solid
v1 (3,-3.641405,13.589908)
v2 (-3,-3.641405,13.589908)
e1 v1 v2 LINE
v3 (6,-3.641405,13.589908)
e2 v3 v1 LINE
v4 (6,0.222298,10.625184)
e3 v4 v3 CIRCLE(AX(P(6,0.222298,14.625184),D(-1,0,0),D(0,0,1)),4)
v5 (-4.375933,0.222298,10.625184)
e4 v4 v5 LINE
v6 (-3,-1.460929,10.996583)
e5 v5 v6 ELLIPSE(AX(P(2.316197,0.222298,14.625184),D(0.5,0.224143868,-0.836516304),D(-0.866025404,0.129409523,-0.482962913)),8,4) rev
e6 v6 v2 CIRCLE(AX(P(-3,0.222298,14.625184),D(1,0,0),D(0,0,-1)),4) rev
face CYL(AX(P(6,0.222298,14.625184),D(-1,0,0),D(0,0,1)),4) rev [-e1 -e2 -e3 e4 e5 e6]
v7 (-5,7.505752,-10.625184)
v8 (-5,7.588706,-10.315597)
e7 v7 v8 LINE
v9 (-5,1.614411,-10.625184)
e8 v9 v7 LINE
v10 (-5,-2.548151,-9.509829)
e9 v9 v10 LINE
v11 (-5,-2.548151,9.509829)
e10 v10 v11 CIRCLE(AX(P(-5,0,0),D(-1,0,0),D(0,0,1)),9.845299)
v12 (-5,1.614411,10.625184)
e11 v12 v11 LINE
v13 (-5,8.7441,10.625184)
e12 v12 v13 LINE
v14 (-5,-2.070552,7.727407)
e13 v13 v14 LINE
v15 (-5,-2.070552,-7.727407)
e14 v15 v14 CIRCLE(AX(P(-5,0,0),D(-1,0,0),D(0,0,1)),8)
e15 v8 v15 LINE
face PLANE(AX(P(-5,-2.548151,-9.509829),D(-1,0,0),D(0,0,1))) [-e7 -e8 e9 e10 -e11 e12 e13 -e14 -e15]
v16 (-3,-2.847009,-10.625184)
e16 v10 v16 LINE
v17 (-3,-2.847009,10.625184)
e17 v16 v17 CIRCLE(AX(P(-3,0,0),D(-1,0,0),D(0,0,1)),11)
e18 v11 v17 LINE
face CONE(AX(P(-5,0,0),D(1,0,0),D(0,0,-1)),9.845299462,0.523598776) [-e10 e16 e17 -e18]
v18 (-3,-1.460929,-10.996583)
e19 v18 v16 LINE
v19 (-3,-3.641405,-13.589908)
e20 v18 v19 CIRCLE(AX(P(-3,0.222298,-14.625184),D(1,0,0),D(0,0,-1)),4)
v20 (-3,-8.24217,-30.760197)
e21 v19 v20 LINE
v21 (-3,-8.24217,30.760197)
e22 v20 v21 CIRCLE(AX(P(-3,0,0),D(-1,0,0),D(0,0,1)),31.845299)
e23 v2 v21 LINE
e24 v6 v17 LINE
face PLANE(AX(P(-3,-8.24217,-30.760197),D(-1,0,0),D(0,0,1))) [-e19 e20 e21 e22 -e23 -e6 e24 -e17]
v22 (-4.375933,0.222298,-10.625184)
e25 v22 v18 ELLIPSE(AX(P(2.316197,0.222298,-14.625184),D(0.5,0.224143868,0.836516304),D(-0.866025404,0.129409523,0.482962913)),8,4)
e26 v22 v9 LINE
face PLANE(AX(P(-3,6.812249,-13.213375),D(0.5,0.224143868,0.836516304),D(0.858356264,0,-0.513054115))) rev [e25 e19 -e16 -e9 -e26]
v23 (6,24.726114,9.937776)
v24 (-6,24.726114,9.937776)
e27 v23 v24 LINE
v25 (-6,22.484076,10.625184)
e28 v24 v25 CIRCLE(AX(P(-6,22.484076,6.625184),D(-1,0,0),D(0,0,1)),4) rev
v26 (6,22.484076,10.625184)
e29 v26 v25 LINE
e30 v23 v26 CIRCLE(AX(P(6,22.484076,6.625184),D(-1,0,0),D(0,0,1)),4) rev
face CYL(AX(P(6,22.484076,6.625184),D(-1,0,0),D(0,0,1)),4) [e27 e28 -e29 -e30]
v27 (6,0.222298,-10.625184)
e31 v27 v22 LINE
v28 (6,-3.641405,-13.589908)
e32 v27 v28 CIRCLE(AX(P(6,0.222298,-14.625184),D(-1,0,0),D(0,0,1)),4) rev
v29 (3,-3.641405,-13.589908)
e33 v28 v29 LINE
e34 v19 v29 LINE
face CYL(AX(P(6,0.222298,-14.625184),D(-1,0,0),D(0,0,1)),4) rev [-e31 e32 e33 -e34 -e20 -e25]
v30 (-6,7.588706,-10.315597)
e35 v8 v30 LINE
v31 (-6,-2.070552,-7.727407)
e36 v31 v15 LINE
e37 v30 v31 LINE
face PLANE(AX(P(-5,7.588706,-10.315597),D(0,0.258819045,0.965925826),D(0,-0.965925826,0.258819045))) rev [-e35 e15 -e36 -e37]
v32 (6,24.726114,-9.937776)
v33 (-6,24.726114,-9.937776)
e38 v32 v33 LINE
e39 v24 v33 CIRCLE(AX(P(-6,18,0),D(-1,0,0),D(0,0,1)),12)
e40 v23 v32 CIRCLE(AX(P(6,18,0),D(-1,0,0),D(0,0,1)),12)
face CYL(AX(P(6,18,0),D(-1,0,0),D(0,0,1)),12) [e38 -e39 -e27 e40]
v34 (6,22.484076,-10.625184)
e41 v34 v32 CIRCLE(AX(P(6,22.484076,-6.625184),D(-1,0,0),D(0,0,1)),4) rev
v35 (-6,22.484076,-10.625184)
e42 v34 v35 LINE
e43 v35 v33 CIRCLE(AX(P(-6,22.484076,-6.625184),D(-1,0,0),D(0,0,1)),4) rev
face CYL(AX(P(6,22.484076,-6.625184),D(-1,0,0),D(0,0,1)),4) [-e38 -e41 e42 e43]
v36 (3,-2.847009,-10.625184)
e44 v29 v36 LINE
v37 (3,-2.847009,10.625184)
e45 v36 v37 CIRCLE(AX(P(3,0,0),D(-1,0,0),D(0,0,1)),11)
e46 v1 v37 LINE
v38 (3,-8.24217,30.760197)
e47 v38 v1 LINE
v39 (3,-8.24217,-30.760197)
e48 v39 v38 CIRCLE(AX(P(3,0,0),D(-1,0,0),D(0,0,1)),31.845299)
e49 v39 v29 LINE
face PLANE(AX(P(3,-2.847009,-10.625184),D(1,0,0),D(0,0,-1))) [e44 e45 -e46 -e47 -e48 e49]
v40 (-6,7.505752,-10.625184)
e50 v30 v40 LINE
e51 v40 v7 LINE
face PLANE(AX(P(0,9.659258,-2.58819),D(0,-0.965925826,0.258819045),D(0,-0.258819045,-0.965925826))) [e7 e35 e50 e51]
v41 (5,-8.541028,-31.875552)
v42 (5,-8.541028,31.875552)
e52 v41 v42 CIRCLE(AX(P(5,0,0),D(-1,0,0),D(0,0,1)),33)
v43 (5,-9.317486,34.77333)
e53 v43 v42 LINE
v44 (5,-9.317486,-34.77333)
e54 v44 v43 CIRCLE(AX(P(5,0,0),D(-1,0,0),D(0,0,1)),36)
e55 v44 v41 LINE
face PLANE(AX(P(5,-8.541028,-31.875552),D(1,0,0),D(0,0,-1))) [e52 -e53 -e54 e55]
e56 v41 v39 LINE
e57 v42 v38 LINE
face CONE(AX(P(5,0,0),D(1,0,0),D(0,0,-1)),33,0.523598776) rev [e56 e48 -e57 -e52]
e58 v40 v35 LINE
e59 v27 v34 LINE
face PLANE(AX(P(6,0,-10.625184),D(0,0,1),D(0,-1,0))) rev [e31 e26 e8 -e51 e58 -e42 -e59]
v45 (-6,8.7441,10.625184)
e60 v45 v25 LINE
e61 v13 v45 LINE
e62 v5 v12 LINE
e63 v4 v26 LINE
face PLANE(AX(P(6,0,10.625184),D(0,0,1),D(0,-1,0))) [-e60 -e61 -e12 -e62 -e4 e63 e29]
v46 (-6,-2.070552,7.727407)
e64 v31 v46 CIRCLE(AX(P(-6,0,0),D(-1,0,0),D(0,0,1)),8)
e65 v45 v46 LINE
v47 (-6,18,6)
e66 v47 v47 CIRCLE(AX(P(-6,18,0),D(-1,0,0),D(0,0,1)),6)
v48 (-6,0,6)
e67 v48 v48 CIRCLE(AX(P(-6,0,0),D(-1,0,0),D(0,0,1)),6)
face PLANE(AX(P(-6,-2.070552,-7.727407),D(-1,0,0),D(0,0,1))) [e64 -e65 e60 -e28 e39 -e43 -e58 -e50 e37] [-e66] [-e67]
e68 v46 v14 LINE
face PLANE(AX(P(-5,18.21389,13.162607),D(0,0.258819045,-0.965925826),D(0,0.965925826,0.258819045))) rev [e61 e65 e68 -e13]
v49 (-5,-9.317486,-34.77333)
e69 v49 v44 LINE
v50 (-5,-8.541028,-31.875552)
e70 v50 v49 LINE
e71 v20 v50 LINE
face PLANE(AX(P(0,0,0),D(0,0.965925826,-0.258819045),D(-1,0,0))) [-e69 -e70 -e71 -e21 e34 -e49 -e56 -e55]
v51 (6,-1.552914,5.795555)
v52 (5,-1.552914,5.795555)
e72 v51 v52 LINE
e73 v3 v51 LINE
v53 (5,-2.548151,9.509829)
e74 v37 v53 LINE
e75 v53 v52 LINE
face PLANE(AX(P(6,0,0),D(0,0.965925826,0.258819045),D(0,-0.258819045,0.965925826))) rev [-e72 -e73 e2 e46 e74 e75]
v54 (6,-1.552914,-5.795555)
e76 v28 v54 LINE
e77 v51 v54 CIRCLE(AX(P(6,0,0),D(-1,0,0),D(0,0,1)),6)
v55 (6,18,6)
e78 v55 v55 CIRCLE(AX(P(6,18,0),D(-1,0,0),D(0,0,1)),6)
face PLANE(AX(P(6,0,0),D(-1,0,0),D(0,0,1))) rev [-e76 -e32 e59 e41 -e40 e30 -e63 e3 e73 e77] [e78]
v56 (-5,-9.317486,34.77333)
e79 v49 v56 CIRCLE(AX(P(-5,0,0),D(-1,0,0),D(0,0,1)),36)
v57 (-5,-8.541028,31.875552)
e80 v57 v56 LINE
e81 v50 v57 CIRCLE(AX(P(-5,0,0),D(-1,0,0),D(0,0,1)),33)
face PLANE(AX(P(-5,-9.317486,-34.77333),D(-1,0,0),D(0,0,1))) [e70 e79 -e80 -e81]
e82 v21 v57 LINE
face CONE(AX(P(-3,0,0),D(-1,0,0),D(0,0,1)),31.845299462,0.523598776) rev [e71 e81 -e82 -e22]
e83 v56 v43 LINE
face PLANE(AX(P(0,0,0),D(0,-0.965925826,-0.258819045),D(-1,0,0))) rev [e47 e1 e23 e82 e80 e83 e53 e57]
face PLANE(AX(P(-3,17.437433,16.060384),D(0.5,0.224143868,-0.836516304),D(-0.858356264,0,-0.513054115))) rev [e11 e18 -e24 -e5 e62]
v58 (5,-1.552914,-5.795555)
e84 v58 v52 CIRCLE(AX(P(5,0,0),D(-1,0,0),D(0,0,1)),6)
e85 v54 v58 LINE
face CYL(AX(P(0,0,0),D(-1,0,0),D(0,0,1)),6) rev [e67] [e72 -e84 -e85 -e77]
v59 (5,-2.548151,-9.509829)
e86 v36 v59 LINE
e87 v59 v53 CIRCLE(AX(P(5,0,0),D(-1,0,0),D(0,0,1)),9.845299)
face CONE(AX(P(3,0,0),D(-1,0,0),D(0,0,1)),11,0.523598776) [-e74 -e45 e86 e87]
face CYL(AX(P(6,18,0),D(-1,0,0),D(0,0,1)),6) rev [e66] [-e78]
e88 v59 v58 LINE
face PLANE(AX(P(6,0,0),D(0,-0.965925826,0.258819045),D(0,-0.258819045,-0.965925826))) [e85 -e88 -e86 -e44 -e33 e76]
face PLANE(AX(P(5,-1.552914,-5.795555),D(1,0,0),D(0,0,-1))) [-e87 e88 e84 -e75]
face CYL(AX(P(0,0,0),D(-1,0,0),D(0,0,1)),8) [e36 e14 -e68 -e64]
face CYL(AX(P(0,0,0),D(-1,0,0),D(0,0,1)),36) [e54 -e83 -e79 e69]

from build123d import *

# Parameters (mm, degrees)
REVOLVE1_ANGLE           = 75
REVOLVE1_OTHER_WAY_ANGLE = 75
BOSS_EXTRUDE3_START      = -12
BOSS_EXTRUDE3_OUTLINE_R  = 6
BOSS_EXTRUDE3_DEPTH      = 12
CUT_EXTRUDE1_DEPTH       = 10
CUT_EXTRUDE2_DEPTH       = 21


# Read off the part's stored shape, not the designer's step: Boss-Extrude3
with BuildPart() as part:
    # Sketch1 → Revolve1 (revolve)
    with BuildSketch(Plane.XY):
        Polygon((-6, -8), (-6, -6), (5, -6), (5, -9.845299462), (3, -11), (3, -31.845299462), (5, -33), (5, -36), (-5, -36), (-5, -33), (-3, -31.845299462), (-3, -11), (-5, -9.845299462), (-5, -8), align=None)
    revolve(axis=Axis((0, 0, 0), (1, 0, 0)), revolution_arc=REVOLVE1_ANGLE)

    # Sketch1 → Revolve1 other way (revolve)
    with BuildSketch(Plane.XY):
        Polygon((-6, -8), (-6, -6), (5, -6), (5, -9.845299462), (3, -11), (3, -31.845299462), (5, -33), (5, -36), (-5, -36), (-5, -33), (-3, -31.845299462), (-3, -11), (-5, -9.845299462), (-5, -8), align=None)
    revolve(axis=Axis((0, 0, 0), (-1, 0, 0)), revolution_arc=REVOLVE1_OTHER_WAY_ANGLE)

    # Boss-Extrude3 outline → Boss-Extrude3 (add)
    with BuildSketch(Plane.ZY.offset(6).offset(BOSS_EXTRUDE3_START)):
        with BuildLine():
            ThreePointArc((-5.795554958, -1.552914271), (0, 6), (5.795554958, -1.552914271))
            Line((5.795554958, -1.552914271), (13.589907909, -3.641404849))
            ThreePointArc((13.589907909, -3.641404849), (11.451770728, -2.21274726), (10.625184089, 0.222298456))
            Line((10.625184089, 0.222298456), (10.625184089, 22.4840758))
            ThreePointArc((10.625184089, 22.4840758), (10.449472793, 23.656601242), (9.937776134, 24.726113701))
            ThreePointArc((9.937776134, 24.726113701), (0, 30), (-9.937776134, 24.726113701))
            ThreePointArc((-9.937776134, 24.726113701), (-10.449472793, 23.656601242), (-10.625184089, 22.4840758))
            Line((-10.625184089, 22.4840758), (-10.625184089, 0.222298456))
            ThreePointArc((-10.625184089, 0.222298456), (-11.451770728, -2.21274726), (-13.589907909, -3.641404849))
            Line((-13.589907909, -3.641404849), (-5.795554958, -1.552914271))
        make_face()
        with Locations((0, 18)):
            Circle(BOSS_EXTRUDE3_OUTLINE_R, mode=Mode.SUBTRACT)
    extrude(amount=BOSS_EXTRUDE3_DEPTH)

    # Sketch4 → Cut-Extrude1 (cut)
    with BuildSketch(Plane(origin=(0, 0, 0), x_dir=(1, 0, 0), z_dir=(0, -0.9659258262890691, 0.258819045102518))):
        Polygon((-3, -14.069307952), (-3, -11), (-5, -9.845299462), (-5, -8), (-6, -8), (-6, -14.069307952), align=None)
    extrude(amount=-CUT_EXTRUDE1_DEPTH, mode=Mode.SUBTRACT)

    # Sketch5 → Cut-Extrude2 (cut)
    with BuildSketch(Plane(origin=(0, 0, 0), x_dir=(1, 0, 0), z_dir=(0, -0.9659258262890691, -0.25881904510251813))):
        Polygon((-3, 14.069307952), (-3, 11), (-5, 9.845299462), (-5, 8), (-6, 8), (-6, 14.069307952), align=None)
    extrude(amount=-CUT_EXTRUDE2_DEPTH, mode=Mode.SUBTRACT)


solid = part.part
